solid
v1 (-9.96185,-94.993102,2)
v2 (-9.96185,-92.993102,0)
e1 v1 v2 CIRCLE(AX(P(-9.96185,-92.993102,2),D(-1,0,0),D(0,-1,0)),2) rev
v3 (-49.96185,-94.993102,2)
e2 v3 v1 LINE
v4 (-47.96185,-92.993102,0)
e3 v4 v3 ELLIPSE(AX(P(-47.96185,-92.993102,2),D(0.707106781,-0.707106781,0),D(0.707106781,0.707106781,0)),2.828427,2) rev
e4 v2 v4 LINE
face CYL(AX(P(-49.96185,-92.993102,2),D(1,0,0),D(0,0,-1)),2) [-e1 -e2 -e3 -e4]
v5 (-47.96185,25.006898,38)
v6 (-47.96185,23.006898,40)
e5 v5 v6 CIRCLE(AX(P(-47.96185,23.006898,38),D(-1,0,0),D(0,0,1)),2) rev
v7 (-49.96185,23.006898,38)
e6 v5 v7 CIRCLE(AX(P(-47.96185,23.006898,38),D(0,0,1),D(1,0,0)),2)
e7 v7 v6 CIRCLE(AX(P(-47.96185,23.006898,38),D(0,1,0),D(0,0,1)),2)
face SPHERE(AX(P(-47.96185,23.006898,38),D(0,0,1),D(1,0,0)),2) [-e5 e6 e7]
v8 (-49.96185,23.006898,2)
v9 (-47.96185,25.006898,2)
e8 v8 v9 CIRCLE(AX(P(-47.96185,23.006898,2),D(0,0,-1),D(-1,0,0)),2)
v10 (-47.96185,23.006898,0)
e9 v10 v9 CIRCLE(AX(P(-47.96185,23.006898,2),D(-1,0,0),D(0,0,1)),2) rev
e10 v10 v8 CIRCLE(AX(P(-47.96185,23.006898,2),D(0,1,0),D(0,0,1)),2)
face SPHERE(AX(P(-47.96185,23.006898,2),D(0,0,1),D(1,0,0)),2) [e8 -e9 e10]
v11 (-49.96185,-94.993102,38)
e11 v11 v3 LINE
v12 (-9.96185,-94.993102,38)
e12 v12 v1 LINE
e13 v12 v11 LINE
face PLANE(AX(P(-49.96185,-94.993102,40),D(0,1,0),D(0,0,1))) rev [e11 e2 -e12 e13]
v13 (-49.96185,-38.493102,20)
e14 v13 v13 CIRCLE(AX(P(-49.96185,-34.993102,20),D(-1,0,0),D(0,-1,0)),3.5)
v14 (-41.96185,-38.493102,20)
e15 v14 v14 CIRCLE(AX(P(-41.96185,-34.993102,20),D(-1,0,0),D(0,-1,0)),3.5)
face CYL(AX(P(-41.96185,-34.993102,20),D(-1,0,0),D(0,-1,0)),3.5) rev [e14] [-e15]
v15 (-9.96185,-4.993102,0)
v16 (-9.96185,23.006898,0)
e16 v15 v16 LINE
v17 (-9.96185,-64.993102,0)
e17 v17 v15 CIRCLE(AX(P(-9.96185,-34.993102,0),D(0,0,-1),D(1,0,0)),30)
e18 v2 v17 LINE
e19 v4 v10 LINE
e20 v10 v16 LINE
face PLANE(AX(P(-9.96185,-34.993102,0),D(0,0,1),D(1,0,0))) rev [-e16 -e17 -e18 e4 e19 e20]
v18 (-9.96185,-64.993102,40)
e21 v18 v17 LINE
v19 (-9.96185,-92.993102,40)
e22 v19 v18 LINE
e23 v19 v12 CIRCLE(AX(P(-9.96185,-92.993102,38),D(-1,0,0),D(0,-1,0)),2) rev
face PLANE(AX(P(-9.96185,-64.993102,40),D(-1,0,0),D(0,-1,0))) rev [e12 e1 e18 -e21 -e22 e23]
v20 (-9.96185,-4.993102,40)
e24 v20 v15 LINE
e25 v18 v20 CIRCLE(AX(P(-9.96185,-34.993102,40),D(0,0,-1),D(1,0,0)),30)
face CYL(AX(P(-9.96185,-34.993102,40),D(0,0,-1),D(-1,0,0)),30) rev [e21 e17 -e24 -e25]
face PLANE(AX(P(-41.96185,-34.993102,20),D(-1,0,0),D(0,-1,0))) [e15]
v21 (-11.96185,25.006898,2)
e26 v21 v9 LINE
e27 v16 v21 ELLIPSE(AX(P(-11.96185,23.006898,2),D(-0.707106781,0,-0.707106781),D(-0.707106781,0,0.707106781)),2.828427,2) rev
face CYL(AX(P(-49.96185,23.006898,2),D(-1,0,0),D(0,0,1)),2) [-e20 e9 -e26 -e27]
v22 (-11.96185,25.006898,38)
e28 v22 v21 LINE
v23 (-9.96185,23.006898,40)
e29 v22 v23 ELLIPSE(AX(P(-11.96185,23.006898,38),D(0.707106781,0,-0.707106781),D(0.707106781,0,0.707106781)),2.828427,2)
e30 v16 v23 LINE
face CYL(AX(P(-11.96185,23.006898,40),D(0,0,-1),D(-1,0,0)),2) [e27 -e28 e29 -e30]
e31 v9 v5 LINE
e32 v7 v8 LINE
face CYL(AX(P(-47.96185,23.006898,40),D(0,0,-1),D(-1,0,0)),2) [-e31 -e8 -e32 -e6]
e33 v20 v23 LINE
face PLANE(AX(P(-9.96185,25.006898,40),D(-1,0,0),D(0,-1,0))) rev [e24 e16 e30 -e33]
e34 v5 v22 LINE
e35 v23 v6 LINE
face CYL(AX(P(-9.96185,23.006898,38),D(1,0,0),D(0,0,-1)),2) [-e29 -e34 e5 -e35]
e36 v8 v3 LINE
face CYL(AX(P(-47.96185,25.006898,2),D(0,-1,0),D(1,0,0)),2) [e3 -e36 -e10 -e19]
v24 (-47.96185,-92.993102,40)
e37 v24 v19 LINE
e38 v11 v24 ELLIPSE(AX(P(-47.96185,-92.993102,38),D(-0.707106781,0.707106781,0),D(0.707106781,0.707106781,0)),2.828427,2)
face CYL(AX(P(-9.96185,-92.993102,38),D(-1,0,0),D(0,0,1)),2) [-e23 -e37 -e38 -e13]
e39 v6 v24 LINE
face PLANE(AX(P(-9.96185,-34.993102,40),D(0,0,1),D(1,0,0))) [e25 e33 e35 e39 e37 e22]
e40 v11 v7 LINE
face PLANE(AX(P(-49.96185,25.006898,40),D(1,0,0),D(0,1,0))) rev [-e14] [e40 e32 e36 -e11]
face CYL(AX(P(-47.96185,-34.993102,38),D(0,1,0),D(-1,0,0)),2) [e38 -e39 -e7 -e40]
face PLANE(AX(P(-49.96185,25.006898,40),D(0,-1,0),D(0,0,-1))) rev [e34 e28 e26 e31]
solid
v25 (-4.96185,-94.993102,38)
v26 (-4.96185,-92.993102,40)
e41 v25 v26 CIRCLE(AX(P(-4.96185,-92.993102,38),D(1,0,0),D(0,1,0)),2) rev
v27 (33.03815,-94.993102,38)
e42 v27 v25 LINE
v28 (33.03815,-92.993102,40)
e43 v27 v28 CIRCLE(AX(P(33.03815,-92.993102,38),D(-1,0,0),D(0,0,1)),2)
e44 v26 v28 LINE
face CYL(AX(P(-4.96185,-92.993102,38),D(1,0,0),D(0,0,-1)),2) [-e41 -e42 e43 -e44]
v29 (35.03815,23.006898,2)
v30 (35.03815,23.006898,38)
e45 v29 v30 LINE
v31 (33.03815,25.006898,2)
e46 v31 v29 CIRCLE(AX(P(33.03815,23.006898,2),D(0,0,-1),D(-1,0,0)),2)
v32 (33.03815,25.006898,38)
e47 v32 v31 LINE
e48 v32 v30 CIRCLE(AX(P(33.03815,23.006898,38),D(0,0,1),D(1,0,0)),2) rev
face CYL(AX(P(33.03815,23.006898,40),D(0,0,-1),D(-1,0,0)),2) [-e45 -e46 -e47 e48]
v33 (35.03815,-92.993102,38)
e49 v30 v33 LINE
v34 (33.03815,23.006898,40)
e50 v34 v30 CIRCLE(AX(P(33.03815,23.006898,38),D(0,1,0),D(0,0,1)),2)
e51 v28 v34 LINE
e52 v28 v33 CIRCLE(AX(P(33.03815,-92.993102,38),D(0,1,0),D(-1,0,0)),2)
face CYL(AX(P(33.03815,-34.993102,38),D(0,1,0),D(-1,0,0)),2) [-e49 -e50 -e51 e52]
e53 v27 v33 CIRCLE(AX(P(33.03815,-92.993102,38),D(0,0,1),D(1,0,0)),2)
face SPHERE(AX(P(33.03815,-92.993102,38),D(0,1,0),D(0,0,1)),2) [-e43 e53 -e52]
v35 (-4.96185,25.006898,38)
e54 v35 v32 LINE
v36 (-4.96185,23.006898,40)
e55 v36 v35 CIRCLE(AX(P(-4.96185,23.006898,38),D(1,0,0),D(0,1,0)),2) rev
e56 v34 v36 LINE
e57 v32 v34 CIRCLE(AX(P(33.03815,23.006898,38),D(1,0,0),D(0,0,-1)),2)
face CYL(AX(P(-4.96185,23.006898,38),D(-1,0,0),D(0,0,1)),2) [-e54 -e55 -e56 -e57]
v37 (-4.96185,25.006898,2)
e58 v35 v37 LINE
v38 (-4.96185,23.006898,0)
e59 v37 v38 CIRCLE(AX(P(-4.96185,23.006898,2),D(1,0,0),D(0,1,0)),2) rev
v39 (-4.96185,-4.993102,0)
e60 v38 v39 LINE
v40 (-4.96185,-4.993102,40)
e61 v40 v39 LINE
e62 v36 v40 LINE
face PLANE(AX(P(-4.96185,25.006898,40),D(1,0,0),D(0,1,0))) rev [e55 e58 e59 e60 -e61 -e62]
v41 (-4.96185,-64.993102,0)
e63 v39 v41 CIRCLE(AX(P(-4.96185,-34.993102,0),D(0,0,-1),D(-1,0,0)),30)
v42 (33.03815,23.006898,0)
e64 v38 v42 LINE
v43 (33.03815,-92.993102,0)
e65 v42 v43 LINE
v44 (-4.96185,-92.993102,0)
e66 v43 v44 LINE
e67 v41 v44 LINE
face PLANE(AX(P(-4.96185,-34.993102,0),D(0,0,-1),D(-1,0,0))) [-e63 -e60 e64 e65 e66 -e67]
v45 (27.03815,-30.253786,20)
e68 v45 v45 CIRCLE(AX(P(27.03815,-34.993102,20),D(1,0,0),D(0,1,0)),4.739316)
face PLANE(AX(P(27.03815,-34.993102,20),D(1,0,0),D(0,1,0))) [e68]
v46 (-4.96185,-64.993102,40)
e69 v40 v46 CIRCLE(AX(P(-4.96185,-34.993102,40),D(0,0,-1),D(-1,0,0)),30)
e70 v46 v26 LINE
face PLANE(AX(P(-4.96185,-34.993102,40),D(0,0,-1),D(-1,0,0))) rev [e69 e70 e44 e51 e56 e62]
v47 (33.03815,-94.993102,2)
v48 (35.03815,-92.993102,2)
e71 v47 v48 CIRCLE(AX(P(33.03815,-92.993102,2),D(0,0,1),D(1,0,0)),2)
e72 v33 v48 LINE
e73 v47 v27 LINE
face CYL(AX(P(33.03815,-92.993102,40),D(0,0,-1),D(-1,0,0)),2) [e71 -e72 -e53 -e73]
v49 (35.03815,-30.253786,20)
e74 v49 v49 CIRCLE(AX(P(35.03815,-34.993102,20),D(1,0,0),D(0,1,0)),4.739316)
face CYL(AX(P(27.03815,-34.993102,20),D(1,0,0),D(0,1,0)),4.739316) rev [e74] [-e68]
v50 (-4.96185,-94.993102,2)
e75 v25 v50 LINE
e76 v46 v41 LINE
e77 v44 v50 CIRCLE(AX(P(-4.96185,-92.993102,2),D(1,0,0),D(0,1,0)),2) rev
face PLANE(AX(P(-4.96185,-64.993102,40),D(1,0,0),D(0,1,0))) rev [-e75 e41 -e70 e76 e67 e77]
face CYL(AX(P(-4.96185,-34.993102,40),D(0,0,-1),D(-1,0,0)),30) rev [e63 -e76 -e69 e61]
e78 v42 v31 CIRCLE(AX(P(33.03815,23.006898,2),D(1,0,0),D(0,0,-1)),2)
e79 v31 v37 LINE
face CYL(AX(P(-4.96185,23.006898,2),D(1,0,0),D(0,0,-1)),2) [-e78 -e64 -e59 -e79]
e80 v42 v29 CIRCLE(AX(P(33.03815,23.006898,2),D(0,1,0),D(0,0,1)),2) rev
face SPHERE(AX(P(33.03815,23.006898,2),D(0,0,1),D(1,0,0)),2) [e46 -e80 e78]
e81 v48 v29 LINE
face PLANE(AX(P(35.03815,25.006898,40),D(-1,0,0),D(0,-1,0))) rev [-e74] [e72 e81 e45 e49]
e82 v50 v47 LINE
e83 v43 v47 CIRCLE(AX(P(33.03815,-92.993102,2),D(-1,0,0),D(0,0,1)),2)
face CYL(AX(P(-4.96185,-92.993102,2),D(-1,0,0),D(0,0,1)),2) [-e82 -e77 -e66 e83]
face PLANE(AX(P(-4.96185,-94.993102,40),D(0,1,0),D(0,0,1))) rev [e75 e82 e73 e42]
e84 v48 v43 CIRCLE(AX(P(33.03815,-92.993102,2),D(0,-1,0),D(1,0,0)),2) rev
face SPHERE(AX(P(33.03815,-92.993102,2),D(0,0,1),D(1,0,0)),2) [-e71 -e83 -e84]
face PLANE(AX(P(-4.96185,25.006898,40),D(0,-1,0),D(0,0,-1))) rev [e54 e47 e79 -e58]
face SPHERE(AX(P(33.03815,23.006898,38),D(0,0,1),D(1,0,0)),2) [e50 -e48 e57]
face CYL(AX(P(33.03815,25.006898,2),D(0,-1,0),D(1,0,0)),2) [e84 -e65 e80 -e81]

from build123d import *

# Parameters (mm, degrees)
BOSS_EXTRUDE1_DEPTH   = 40
BOSS_EXTRUDE1_2_DEPTH = 40
FILLET1_R             = 2
FILLET2_R             = 2
FILLET3_R             = 2
SKETCH2_R             = 3.5
CUT_EXTRUDE2_DEPTH    = 8
SKETCH3_R             = 4.739315761
CUT_EXTRUDE3_DEPTH    = 8


with BuildPart() as part:
    # Sketch1 → Boss-Extrude1 (new body)
    with BuildSketch(Plane.XY):
        with BuildLine():
            Line((-9.961849725, -64.993102173), (-9.961849725, -94.993102173))
            Line((-9.961849725, -94.993102173), (-49.961849725, -94.993102173))
            Line((-49.961849725, -94.993102173), (-49.961849725, 25.006897827))
            Line((-49.961849725, 25.006897827), (-9.961849725, 25.006897827))
            Line((-9.961849725, 25.006897827), (-9.961849725, -4.993102173))
            ThreePointArc((-9.961849725, -4.993102173), (-39.961849725, -34.993102173), (-9.961849725, -64.993102173))
        make_face()
    extrude(amount=BOSS_EXTRUDE1_DEPTH)

    # Fillet2
    fillet2_edges = [part.edges().sort_by_distance(p)[0] for p in [
        (-49.961849725, 25.006897827, 20),
        (-9.961849725, 25.006897827, 20),
        (-29.961849725, 25.006897827, 40),
        (-49.961849725, -34.993102173, 40),
        (-29.961849725, 25.006897827, 0),
        (-29.961849725, -94.993102173, 40),
        (-29.961849725, -94.993102173, 0),
        (-49.961849725, -34.993102173, 0),
    ]]
    fillet(fillet2_edges, radius=FILLET2_R)

    # Sketch2 → Cut-Extrude2 (cut)
    with BuildSketch(Plane.ZY.offset(49.961849725)):
        with Locations(Location((20, -34.993102173, 0), (0, 0, 270))):
            Circle(SKETCH2_R)
    extrude(amount=-CUT_EXTRUDE2_DEPTH, mode=Mode.SUBTRACT)


with BuildPart() as body_2:
    # Sketch1 → Boss-Extrude1 2 (new body)
    with BuildSketch(Plane.XY):
        with BuildLine():
            Line((-4.961849725, 25.006897827), (35.038150275, 25.006897827))
            Line((35.038150275, 25.006897827), (35.038150275, -94.993102173))
            Line((35.038150275, -94.993102173), (-4.961849725, -94.993102173))
            Line((-4.961849725, -94.993102173), (-4.961849725, -64.993102173))
            ThreePointArc((-4.961849725, -64.993102173), (25.038150275, -34.993102173), (-4.961849725, -4.993102173))
            Line((-4.961849725, -4.993102173), (-4.961849725, 25.006897827))
        make_face()
    extrude(amount=BOSS_EXTRUDE1_2_DEPTH)

    # Fillet1
    fillet1_edges = [body_2.edges().sort_by_distance(p)[0] for p in [
        (35.038150275, 25.006897827, 20),
        (35.038150275, -34.993102173, 40),
        (15.038150275, 25.006897827, 40),
        (15.038150275, 25.006897827, 0),
        (35.038150275, -34.993102173, 0),
        (15.038150275, -94.993102173, 0),
    ]]
    fillet(fillet1_edges, radius=FILLET1_R)

    # Fillet3
    # the kernel refuses this fillet: 2 mm, written as the material it takes off along each edge
    with BuildSketch(Plane(origin=(33.038150275, -92.993102173, 2), x_dir=(1, 0, 0), z_dir=(0, -1, 0))) as fillet3_piece_1_section:
        Polygon((0, 0), (FILLET3_R, 0), (FILLET3_R, -FILLET3_R), (0, -FILLET3_R), align=None)
    fillet3_piece_1 = extrude(amount=FILLET3_R, mode=Mode.PRIVATE)
    fillet3_piece_1 = fillet3_piece_1 - Plane(origin=(33.038150275, -92.993102173, 2), x_dir=(-0.7071067811865475, 0, 0.7071067811865475), z_dir=(0, -1, 0)) * Sphere(FILLET3_R, mode=Mode.PRIVATE)
    add(fillet3_piece_1, mode=Mode.SUBTRACT)
    with BuildSketch(Plane(origin=(33.038150275, -94.993102173, 40), x_dir=(0, 1, 0), z_dir=(-1, 0, 0))) as fillet3_piece_2:
        with BuildLine():
            CenterArc((FILLET3_R, FILLET3_R), FILLET3_R, 180, 90)
            Line((0, FILLET3_R), (0, 0))
            Line((0, 0), (FILLET3_R, 0))
        make_face()
    extrude(amount=43, mode=Mode.SUBTRACT)
    with BuildSketch(Plane(origin=(35.038150275, -94.993102173, 2), x_dir=(-1, 0, 0), z_dir=(0, 0, 1))) as fillet3_piece_3:
        with BuildLine():
            CenterArc((FILLET3_R, -FILLET3_R), FILLET3_R, 90, 90)
            Line((0, -FILLET3_R), (0, 0))
            Line((0, 0), (FILLET3_R, 0))
        make_face()
    extrude(amount=36, mode=Mode.SUBTRACT)
    with BuildSketch(Plane(origin=(33.038150275, -94.993102173, 38), x_dir=(1, 0, 0), z_dir=(0, 0, -1))) as fillet3_piece_4:
        with BuildLine():
            CenterArc((2 - FILLET3_R, -FILLET3_R), FILLET3_R, 0, 90)
            Line((2 - FILLET3_R, 0), (2, 0))
            Line((2, 0), (2, -FILLET3_R))
        make_face()
    revolve(axis=Axis((33.038150275, -94.993102173, 38), (0, -1, 0)), revolution_arc=90, mode=Mode.SUBTRACT)

    # Sketch3 → Cut-Extrude3 (cut)
    with BuildSketch(Plane(origin=(35.038150275, 0, 0), x_dir=(0, 0, -1), z_dir=(1, 0, 0))):
        with Locations(Location((-20, -34.993102173, 0), (0, 0, 90))):
            Circle(SKETCH3_R)
    extrude(amount=-CUT_EXTRUDE3_DEPTH, mode=Mode.SUBTRACT)


solid = Compound([part.part, body_2.part])
